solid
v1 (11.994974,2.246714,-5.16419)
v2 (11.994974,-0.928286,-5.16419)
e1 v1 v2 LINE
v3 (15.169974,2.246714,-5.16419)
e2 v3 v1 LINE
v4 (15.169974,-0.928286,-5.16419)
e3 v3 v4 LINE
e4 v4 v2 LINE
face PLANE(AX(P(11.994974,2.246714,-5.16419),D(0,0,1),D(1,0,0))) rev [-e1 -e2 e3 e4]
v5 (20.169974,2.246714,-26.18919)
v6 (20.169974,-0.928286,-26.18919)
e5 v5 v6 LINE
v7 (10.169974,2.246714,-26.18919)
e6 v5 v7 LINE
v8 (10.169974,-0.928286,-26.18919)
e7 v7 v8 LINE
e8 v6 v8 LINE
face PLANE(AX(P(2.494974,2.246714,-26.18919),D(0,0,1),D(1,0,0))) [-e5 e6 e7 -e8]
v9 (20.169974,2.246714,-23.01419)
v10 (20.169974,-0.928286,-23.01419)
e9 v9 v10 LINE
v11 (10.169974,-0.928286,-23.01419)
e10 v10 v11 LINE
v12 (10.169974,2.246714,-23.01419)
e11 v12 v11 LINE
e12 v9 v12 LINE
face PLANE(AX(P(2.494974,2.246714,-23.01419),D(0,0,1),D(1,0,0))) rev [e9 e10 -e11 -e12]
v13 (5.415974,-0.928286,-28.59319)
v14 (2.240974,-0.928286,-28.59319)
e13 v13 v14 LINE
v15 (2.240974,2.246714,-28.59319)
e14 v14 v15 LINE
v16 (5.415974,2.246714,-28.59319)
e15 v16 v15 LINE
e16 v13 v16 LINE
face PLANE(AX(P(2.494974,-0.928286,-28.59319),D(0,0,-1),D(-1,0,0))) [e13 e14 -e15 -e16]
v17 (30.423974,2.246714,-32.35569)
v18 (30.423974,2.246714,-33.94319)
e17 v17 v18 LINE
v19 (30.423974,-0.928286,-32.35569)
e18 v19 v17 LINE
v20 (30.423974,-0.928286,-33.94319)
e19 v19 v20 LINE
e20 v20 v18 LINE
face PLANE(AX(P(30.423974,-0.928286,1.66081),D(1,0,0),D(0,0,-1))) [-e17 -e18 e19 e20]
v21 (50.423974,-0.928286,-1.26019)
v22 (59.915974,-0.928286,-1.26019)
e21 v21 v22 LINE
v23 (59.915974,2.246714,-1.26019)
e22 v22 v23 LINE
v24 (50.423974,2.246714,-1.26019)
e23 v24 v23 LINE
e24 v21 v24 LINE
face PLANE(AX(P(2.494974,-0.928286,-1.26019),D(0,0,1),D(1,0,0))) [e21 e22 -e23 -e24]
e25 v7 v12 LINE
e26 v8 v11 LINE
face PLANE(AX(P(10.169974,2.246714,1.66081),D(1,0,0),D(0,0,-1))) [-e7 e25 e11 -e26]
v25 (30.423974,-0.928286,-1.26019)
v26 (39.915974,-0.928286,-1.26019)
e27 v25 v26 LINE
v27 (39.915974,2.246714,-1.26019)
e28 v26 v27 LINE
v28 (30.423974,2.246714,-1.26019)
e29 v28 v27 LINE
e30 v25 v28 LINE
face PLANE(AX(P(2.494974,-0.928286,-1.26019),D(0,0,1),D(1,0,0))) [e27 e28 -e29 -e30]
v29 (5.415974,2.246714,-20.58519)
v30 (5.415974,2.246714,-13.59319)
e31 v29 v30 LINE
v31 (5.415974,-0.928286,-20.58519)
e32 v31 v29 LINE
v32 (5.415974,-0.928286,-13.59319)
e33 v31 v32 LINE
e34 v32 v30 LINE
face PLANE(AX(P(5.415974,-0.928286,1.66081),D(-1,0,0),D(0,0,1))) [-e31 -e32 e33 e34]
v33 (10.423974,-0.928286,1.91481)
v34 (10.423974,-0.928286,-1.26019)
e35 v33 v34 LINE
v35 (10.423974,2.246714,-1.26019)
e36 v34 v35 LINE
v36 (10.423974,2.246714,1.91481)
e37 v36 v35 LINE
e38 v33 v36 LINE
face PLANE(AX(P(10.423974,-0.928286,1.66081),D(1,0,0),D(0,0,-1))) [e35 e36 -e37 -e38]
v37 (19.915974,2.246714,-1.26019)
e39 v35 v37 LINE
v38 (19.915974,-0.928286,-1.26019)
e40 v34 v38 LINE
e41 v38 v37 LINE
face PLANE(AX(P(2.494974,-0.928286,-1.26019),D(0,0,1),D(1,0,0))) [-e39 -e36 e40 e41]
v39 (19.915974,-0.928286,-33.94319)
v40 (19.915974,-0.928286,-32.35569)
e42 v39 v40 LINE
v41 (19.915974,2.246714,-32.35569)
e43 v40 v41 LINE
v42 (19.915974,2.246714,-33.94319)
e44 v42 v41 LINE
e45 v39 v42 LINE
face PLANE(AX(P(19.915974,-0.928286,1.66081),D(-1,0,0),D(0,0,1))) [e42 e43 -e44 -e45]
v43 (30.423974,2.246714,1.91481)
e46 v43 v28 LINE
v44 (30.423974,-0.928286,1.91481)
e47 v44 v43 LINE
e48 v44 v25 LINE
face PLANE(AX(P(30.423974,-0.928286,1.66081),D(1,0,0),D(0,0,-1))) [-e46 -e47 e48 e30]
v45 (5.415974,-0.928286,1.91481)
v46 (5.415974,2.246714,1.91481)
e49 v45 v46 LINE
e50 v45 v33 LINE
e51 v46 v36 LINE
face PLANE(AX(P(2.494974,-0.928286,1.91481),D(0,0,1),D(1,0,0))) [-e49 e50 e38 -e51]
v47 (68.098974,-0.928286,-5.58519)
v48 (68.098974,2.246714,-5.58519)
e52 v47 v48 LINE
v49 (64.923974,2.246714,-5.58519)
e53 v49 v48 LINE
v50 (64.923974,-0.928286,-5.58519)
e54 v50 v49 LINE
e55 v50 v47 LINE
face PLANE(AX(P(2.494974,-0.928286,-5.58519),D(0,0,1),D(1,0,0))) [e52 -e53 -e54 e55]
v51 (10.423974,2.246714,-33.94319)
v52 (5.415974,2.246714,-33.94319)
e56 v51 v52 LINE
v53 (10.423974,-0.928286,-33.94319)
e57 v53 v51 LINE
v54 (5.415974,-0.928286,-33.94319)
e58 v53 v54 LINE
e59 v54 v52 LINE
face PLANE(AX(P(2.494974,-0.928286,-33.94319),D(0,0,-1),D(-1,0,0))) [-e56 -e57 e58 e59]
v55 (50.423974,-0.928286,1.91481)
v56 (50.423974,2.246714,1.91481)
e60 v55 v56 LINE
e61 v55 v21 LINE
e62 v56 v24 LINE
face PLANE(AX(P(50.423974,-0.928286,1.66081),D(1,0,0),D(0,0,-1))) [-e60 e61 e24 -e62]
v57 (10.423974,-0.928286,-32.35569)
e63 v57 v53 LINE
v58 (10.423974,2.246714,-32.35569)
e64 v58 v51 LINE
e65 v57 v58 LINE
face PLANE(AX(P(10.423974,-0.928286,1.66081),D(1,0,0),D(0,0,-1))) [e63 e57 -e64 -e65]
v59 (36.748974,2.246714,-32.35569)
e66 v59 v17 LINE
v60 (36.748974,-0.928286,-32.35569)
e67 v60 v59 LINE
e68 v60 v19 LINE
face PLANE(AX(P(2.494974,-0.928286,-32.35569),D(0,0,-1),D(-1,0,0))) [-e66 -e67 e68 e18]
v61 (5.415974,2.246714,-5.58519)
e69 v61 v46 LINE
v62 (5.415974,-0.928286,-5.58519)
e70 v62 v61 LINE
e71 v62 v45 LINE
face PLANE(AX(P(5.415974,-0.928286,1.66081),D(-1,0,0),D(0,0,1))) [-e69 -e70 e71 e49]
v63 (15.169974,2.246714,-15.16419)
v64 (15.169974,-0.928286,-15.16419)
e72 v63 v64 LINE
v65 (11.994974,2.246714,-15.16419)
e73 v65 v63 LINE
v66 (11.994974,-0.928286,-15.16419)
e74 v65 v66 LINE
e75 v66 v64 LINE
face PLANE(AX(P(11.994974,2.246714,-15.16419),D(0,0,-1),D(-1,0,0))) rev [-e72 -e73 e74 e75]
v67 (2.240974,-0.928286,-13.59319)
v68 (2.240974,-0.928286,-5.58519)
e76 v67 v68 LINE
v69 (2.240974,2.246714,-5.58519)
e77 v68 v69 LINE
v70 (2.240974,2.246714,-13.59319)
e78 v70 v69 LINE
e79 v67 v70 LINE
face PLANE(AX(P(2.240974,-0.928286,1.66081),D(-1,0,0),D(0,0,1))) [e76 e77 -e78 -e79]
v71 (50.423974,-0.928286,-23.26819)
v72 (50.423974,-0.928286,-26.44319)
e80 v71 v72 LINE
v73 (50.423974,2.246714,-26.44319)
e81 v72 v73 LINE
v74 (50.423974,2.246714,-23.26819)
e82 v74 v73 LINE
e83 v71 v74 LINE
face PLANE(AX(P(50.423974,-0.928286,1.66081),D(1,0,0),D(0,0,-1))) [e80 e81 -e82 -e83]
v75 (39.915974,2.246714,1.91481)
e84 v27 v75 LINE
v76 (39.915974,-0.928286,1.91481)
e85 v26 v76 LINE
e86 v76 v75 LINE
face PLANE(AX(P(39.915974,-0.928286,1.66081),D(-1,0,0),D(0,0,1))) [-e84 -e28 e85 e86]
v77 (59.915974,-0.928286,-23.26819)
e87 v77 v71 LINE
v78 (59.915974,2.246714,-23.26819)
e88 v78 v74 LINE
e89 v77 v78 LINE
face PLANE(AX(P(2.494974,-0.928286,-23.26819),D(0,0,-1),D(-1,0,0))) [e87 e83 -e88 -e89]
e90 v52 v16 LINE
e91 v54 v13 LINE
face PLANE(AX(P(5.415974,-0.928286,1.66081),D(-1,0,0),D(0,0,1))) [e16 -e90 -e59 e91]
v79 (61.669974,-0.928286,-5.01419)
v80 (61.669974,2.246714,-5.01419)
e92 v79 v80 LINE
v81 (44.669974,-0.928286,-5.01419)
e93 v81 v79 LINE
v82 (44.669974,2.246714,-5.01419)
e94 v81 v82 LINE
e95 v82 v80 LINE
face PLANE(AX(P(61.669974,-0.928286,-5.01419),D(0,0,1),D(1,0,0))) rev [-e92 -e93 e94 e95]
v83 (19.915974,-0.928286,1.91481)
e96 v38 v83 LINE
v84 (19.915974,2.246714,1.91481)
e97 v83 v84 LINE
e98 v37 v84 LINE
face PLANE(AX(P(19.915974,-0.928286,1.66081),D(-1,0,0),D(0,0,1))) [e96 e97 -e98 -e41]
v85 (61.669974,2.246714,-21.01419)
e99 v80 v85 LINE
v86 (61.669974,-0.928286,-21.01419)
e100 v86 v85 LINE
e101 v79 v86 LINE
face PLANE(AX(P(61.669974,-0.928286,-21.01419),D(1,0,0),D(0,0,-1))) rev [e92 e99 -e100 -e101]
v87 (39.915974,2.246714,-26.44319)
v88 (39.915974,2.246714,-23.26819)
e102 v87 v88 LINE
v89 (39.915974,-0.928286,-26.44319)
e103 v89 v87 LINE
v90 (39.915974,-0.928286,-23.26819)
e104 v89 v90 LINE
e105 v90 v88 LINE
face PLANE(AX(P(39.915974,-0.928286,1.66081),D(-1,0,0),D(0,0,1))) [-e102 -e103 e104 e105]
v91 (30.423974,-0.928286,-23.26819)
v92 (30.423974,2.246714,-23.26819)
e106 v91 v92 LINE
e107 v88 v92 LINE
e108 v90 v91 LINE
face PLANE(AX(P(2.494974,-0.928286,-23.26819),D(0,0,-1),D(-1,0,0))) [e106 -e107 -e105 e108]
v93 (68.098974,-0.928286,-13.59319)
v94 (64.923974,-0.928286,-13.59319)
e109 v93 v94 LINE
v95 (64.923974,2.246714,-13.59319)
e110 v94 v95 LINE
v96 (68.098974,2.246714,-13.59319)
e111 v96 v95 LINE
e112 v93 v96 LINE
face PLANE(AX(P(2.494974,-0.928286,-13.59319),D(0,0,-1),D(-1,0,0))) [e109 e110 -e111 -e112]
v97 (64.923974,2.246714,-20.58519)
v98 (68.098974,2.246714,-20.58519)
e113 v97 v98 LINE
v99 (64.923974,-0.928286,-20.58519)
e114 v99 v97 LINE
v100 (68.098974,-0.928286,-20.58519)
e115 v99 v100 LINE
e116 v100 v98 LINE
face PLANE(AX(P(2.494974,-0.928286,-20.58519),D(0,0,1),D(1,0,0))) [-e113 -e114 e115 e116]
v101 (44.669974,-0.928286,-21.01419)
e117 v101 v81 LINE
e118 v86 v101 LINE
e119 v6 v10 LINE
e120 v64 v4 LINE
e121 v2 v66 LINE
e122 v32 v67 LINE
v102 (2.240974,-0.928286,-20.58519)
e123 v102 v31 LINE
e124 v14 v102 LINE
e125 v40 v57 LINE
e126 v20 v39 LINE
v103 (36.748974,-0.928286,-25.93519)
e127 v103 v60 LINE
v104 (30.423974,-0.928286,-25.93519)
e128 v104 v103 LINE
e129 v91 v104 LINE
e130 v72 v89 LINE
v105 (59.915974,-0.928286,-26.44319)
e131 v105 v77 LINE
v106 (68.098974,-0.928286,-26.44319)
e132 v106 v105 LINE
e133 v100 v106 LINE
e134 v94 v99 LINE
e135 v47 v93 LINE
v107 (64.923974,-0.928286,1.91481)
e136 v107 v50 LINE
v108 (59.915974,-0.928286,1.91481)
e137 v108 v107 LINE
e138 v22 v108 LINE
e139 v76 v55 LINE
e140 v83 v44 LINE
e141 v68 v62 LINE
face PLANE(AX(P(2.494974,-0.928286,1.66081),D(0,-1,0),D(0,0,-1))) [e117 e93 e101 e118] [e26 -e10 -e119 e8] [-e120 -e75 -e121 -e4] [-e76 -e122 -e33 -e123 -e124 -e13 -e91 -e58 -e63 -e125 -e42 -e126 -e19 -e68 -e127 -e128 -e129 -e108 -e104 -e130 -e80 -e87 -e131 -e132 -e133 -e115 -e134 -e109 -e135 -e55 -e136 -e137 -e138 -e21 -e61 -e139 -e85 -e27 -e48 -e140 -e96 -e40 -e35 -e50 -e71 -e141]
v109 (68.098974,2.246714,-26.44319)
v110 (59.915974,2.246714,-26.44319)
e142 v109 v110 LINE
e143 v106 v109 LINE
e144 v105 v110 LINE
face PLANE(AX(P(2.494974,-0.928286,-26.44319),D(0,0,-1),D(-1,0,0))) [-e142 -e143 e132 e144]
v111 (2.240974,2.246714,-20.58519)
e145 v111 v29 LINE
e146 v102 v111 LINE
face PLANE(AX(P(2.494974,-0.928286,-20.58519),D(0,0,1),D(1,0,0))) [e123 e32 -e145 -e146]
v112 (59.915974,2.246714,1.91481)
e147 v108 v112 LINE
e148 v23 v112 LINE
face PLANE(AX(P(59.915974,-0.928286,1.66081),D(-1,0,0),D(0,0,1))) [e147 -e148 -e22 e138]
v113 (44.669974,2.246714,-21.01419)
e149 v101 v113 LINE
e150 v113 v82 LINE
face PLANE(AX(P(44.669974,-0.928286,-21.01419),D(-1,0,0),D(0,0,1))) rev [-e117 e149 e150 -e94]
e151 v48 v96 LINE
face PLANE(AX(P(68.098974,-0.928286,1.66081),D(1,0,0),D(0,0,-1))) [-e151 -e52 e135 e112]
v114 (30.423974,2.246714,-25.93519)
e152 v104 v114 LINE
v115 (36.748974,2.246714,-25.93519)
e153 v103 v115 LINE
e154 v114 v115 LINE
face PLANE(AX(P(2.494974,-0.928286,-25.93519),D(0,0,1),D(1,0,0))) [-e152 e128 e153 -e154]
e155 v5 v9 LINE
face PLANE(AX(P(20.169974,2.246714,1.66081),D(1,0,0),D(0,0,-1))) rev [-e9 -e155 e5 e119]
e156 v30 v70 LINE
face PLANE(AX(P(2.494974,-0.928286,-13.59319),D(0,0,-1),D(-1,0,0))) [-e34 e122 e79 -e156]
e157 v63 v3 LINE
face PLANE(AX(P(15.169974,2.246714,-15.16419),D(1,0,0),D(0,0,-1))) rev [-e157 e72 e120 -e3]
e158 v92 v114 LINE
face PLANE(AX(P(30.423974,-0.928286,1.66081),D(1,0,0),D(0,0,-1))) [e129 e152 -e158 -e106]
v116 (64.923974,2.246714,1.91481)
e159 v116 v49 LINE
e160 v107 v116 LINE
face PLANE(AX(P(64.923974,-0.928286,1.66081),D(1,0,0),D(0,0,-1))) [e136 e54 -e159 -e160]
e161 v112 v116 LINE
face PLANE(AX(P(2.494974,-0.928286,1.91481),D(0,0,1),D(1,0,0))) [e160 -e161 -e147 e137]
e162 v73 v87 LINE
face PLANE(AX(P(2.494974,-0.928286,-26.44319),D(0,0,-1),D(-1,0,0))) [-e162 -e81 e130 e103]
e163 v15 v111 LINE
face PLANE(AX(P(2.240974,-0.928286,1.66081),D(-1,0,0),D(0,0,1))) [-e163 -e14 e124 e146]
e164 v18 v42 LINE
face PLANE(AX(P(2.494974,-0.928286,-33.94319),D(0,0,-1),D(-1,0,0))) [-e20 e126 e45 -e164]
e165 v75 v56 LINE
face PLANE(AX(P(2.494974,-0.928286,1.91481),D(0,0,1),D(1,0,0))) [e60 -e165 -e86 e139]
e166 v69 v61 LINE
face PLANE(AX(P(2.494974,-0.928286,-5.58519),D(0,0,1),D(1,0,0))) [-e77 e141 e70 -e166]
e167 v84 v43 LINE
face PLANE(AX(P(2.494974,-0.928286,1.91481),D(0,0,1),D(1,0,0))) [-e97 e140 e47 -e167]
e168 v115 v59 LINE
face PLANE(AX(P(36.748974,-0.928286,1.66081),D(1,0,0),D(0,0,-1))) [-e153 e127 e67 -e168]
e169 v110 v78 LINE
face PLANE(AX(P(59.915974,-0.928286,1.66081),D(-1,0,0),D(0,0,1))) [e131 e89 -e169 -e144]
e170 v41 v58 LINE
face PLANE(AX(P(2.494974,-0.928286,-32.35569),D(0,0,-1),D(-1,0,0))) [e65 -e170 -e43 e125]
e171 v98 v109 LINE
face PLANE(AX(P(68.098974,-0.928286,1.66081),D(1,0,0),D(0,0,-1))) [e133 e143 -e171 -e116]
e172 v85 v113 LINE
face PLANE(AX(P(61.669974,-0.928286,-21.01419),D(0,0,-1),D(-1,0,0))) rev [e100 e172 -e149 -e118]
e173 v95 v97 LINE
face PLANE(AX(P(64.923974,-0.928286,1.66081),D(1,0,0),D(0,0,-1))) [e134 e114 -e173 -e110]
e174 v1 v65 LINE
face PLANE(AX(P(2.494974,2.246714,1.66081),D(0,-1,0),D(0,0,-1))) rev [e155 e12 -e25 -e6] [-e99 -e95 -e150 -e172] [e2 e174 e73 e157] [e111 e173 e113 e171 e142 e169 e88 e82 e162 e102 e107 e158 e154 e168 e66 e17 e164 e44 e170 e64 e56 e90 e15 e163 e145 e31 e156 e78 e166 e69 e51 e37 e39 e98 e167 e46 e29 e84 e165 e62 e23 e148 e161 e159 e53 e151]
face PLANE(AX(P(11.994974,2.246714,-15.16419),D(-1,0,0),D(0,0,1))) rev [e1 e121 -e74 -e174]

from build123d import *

# Parameters (mm, degrees)
BOTTOM_START                  = -0.928285838
BOTTOM_SIDE_PIECE_OUTLINE_W   = 3.175
BOTTOM_SIDE_PIECE_OUTLINE_H   = 10
BOTTOM_SIDE_PIECE_OUTLINE_W_2 = 10
BOTTOM_SIDE_PIECE_OUTLINE_H_2 = 3.175
BOTTOM_SIDE_PIECE_DEPTH       = 3.175
SKETCH6_W                     = 17
SKETCH6_H                     = 16
CUT_EXTRUDE2_DEPTH            = 77.155702908


# Read off the part's stored shape, not the designer's step: Bottom Side Piece
with BuildPart() as part:
    # Bottom Side Piece outline → Bottom Side Piece (new body)
    with BuildSketch(Plane(origin=(0, 0, 0), x_dir=(1, 0, 0), z_dir=(0, 1, 0)).offset(BOTTOM_START)):
        Polygon((2.240974339, 5.585190103), (5.415974339, 5.585190103), (5.415974339, -1.914809897), (10.423974339, -1.914809897), (10.423974339, 1.260190103), (19.915974339, 1.260190103), (19.915974339, -1.914809897), (30.423974339, -1.914809897), (30.423974339, 1.260190103), (39.915974339, 1.260190103), (39.915974339, -1.914809897), (50.423974339, -1.914809897), (50.423974339, 1.260190103), (59.915974339, 1.260190103), (59.915974339, -1.914809897), (64.923974339, -1.914809897), (64.923974339, 5.585190103), (68.098974339, 5.585190103), (68.098974339, 13.593190103), (64.923974339, 13.593190103), (64.923974339, 20.585190103), (68.098974339, 20.585190103), (68.098974339, 26.443190103), (59.915974339, 26.443190103), (59.915974339, 23.268190103), (50.423974339, 23.268190103), (50.423974339, 26.443190103), (39.915974339, 26.443190103), (39.915974339, 23.268190103), (30.423974339, 23.268190103), (30.423974339, 25.935190103), (36.748974339, 25.935190103), (36.748974339, 32.355690103), (30.423974339, 32.355690103), (30.423974339, 33.943190103), (19.915974339, 33.943190103), (19.915974339, 32.355690103), (10.423974339, 32.355690103), (10.423974339, 33.943190103), (5.415974339, 33.943190103), (5.415974339, 28.593190103), (2.240974339, 28.593190103), (2.240974339, 20.585190103), (5.415974339, 20.585190103), (5.415974339, 13.593190103), (2.240974339, 13.593190103), align=None)
        with Locations((13.582474339, 10.164190103)):
            Rectangle(BOTTOM_SIDE_PIECE_OUTLINE_W, BOTTOM_SIDE_PIECE_OUTLINE_H, mode=Mode.SUBTRACT)
        with Locations((56.757474339, 10.164190103)):
            Rectangle(BOTTOM_SIDE_PIECE_OUTLINE_W, BOTTOM_SIDE_PIECE_OUTLINE_H, mode=Mode.SUBTRACT)
        with Locations((15.169974339, 24.601690103)):
            Rectangle(BOTTOM_SIDE_PIECE_OUTLINE_W_2, BOTTOM_SIDE_PIECE_OUTLINE_H_2, mode=Mode.SUBTRACT)
    extrude(amount=BOTTOM_SIDE_PIECE_DEPTH)

    # Sketch6 → Cut-Extrude2 (cut, through all)
    with BuildSketch(Plane(origin=(0, 2.246714162, 0), x_dir=(1, 0, 0), z_dir=(0, 1, 0))):
        with Locations((53.169974339, 13.014190103)):
            Rectangle(SKETCH6_W, SKETCH6_H)
    extrude(amount=-CUT_EXTRUDE2_DEPTH, mode=Mode.SUBTRACT)


solid = part.part
